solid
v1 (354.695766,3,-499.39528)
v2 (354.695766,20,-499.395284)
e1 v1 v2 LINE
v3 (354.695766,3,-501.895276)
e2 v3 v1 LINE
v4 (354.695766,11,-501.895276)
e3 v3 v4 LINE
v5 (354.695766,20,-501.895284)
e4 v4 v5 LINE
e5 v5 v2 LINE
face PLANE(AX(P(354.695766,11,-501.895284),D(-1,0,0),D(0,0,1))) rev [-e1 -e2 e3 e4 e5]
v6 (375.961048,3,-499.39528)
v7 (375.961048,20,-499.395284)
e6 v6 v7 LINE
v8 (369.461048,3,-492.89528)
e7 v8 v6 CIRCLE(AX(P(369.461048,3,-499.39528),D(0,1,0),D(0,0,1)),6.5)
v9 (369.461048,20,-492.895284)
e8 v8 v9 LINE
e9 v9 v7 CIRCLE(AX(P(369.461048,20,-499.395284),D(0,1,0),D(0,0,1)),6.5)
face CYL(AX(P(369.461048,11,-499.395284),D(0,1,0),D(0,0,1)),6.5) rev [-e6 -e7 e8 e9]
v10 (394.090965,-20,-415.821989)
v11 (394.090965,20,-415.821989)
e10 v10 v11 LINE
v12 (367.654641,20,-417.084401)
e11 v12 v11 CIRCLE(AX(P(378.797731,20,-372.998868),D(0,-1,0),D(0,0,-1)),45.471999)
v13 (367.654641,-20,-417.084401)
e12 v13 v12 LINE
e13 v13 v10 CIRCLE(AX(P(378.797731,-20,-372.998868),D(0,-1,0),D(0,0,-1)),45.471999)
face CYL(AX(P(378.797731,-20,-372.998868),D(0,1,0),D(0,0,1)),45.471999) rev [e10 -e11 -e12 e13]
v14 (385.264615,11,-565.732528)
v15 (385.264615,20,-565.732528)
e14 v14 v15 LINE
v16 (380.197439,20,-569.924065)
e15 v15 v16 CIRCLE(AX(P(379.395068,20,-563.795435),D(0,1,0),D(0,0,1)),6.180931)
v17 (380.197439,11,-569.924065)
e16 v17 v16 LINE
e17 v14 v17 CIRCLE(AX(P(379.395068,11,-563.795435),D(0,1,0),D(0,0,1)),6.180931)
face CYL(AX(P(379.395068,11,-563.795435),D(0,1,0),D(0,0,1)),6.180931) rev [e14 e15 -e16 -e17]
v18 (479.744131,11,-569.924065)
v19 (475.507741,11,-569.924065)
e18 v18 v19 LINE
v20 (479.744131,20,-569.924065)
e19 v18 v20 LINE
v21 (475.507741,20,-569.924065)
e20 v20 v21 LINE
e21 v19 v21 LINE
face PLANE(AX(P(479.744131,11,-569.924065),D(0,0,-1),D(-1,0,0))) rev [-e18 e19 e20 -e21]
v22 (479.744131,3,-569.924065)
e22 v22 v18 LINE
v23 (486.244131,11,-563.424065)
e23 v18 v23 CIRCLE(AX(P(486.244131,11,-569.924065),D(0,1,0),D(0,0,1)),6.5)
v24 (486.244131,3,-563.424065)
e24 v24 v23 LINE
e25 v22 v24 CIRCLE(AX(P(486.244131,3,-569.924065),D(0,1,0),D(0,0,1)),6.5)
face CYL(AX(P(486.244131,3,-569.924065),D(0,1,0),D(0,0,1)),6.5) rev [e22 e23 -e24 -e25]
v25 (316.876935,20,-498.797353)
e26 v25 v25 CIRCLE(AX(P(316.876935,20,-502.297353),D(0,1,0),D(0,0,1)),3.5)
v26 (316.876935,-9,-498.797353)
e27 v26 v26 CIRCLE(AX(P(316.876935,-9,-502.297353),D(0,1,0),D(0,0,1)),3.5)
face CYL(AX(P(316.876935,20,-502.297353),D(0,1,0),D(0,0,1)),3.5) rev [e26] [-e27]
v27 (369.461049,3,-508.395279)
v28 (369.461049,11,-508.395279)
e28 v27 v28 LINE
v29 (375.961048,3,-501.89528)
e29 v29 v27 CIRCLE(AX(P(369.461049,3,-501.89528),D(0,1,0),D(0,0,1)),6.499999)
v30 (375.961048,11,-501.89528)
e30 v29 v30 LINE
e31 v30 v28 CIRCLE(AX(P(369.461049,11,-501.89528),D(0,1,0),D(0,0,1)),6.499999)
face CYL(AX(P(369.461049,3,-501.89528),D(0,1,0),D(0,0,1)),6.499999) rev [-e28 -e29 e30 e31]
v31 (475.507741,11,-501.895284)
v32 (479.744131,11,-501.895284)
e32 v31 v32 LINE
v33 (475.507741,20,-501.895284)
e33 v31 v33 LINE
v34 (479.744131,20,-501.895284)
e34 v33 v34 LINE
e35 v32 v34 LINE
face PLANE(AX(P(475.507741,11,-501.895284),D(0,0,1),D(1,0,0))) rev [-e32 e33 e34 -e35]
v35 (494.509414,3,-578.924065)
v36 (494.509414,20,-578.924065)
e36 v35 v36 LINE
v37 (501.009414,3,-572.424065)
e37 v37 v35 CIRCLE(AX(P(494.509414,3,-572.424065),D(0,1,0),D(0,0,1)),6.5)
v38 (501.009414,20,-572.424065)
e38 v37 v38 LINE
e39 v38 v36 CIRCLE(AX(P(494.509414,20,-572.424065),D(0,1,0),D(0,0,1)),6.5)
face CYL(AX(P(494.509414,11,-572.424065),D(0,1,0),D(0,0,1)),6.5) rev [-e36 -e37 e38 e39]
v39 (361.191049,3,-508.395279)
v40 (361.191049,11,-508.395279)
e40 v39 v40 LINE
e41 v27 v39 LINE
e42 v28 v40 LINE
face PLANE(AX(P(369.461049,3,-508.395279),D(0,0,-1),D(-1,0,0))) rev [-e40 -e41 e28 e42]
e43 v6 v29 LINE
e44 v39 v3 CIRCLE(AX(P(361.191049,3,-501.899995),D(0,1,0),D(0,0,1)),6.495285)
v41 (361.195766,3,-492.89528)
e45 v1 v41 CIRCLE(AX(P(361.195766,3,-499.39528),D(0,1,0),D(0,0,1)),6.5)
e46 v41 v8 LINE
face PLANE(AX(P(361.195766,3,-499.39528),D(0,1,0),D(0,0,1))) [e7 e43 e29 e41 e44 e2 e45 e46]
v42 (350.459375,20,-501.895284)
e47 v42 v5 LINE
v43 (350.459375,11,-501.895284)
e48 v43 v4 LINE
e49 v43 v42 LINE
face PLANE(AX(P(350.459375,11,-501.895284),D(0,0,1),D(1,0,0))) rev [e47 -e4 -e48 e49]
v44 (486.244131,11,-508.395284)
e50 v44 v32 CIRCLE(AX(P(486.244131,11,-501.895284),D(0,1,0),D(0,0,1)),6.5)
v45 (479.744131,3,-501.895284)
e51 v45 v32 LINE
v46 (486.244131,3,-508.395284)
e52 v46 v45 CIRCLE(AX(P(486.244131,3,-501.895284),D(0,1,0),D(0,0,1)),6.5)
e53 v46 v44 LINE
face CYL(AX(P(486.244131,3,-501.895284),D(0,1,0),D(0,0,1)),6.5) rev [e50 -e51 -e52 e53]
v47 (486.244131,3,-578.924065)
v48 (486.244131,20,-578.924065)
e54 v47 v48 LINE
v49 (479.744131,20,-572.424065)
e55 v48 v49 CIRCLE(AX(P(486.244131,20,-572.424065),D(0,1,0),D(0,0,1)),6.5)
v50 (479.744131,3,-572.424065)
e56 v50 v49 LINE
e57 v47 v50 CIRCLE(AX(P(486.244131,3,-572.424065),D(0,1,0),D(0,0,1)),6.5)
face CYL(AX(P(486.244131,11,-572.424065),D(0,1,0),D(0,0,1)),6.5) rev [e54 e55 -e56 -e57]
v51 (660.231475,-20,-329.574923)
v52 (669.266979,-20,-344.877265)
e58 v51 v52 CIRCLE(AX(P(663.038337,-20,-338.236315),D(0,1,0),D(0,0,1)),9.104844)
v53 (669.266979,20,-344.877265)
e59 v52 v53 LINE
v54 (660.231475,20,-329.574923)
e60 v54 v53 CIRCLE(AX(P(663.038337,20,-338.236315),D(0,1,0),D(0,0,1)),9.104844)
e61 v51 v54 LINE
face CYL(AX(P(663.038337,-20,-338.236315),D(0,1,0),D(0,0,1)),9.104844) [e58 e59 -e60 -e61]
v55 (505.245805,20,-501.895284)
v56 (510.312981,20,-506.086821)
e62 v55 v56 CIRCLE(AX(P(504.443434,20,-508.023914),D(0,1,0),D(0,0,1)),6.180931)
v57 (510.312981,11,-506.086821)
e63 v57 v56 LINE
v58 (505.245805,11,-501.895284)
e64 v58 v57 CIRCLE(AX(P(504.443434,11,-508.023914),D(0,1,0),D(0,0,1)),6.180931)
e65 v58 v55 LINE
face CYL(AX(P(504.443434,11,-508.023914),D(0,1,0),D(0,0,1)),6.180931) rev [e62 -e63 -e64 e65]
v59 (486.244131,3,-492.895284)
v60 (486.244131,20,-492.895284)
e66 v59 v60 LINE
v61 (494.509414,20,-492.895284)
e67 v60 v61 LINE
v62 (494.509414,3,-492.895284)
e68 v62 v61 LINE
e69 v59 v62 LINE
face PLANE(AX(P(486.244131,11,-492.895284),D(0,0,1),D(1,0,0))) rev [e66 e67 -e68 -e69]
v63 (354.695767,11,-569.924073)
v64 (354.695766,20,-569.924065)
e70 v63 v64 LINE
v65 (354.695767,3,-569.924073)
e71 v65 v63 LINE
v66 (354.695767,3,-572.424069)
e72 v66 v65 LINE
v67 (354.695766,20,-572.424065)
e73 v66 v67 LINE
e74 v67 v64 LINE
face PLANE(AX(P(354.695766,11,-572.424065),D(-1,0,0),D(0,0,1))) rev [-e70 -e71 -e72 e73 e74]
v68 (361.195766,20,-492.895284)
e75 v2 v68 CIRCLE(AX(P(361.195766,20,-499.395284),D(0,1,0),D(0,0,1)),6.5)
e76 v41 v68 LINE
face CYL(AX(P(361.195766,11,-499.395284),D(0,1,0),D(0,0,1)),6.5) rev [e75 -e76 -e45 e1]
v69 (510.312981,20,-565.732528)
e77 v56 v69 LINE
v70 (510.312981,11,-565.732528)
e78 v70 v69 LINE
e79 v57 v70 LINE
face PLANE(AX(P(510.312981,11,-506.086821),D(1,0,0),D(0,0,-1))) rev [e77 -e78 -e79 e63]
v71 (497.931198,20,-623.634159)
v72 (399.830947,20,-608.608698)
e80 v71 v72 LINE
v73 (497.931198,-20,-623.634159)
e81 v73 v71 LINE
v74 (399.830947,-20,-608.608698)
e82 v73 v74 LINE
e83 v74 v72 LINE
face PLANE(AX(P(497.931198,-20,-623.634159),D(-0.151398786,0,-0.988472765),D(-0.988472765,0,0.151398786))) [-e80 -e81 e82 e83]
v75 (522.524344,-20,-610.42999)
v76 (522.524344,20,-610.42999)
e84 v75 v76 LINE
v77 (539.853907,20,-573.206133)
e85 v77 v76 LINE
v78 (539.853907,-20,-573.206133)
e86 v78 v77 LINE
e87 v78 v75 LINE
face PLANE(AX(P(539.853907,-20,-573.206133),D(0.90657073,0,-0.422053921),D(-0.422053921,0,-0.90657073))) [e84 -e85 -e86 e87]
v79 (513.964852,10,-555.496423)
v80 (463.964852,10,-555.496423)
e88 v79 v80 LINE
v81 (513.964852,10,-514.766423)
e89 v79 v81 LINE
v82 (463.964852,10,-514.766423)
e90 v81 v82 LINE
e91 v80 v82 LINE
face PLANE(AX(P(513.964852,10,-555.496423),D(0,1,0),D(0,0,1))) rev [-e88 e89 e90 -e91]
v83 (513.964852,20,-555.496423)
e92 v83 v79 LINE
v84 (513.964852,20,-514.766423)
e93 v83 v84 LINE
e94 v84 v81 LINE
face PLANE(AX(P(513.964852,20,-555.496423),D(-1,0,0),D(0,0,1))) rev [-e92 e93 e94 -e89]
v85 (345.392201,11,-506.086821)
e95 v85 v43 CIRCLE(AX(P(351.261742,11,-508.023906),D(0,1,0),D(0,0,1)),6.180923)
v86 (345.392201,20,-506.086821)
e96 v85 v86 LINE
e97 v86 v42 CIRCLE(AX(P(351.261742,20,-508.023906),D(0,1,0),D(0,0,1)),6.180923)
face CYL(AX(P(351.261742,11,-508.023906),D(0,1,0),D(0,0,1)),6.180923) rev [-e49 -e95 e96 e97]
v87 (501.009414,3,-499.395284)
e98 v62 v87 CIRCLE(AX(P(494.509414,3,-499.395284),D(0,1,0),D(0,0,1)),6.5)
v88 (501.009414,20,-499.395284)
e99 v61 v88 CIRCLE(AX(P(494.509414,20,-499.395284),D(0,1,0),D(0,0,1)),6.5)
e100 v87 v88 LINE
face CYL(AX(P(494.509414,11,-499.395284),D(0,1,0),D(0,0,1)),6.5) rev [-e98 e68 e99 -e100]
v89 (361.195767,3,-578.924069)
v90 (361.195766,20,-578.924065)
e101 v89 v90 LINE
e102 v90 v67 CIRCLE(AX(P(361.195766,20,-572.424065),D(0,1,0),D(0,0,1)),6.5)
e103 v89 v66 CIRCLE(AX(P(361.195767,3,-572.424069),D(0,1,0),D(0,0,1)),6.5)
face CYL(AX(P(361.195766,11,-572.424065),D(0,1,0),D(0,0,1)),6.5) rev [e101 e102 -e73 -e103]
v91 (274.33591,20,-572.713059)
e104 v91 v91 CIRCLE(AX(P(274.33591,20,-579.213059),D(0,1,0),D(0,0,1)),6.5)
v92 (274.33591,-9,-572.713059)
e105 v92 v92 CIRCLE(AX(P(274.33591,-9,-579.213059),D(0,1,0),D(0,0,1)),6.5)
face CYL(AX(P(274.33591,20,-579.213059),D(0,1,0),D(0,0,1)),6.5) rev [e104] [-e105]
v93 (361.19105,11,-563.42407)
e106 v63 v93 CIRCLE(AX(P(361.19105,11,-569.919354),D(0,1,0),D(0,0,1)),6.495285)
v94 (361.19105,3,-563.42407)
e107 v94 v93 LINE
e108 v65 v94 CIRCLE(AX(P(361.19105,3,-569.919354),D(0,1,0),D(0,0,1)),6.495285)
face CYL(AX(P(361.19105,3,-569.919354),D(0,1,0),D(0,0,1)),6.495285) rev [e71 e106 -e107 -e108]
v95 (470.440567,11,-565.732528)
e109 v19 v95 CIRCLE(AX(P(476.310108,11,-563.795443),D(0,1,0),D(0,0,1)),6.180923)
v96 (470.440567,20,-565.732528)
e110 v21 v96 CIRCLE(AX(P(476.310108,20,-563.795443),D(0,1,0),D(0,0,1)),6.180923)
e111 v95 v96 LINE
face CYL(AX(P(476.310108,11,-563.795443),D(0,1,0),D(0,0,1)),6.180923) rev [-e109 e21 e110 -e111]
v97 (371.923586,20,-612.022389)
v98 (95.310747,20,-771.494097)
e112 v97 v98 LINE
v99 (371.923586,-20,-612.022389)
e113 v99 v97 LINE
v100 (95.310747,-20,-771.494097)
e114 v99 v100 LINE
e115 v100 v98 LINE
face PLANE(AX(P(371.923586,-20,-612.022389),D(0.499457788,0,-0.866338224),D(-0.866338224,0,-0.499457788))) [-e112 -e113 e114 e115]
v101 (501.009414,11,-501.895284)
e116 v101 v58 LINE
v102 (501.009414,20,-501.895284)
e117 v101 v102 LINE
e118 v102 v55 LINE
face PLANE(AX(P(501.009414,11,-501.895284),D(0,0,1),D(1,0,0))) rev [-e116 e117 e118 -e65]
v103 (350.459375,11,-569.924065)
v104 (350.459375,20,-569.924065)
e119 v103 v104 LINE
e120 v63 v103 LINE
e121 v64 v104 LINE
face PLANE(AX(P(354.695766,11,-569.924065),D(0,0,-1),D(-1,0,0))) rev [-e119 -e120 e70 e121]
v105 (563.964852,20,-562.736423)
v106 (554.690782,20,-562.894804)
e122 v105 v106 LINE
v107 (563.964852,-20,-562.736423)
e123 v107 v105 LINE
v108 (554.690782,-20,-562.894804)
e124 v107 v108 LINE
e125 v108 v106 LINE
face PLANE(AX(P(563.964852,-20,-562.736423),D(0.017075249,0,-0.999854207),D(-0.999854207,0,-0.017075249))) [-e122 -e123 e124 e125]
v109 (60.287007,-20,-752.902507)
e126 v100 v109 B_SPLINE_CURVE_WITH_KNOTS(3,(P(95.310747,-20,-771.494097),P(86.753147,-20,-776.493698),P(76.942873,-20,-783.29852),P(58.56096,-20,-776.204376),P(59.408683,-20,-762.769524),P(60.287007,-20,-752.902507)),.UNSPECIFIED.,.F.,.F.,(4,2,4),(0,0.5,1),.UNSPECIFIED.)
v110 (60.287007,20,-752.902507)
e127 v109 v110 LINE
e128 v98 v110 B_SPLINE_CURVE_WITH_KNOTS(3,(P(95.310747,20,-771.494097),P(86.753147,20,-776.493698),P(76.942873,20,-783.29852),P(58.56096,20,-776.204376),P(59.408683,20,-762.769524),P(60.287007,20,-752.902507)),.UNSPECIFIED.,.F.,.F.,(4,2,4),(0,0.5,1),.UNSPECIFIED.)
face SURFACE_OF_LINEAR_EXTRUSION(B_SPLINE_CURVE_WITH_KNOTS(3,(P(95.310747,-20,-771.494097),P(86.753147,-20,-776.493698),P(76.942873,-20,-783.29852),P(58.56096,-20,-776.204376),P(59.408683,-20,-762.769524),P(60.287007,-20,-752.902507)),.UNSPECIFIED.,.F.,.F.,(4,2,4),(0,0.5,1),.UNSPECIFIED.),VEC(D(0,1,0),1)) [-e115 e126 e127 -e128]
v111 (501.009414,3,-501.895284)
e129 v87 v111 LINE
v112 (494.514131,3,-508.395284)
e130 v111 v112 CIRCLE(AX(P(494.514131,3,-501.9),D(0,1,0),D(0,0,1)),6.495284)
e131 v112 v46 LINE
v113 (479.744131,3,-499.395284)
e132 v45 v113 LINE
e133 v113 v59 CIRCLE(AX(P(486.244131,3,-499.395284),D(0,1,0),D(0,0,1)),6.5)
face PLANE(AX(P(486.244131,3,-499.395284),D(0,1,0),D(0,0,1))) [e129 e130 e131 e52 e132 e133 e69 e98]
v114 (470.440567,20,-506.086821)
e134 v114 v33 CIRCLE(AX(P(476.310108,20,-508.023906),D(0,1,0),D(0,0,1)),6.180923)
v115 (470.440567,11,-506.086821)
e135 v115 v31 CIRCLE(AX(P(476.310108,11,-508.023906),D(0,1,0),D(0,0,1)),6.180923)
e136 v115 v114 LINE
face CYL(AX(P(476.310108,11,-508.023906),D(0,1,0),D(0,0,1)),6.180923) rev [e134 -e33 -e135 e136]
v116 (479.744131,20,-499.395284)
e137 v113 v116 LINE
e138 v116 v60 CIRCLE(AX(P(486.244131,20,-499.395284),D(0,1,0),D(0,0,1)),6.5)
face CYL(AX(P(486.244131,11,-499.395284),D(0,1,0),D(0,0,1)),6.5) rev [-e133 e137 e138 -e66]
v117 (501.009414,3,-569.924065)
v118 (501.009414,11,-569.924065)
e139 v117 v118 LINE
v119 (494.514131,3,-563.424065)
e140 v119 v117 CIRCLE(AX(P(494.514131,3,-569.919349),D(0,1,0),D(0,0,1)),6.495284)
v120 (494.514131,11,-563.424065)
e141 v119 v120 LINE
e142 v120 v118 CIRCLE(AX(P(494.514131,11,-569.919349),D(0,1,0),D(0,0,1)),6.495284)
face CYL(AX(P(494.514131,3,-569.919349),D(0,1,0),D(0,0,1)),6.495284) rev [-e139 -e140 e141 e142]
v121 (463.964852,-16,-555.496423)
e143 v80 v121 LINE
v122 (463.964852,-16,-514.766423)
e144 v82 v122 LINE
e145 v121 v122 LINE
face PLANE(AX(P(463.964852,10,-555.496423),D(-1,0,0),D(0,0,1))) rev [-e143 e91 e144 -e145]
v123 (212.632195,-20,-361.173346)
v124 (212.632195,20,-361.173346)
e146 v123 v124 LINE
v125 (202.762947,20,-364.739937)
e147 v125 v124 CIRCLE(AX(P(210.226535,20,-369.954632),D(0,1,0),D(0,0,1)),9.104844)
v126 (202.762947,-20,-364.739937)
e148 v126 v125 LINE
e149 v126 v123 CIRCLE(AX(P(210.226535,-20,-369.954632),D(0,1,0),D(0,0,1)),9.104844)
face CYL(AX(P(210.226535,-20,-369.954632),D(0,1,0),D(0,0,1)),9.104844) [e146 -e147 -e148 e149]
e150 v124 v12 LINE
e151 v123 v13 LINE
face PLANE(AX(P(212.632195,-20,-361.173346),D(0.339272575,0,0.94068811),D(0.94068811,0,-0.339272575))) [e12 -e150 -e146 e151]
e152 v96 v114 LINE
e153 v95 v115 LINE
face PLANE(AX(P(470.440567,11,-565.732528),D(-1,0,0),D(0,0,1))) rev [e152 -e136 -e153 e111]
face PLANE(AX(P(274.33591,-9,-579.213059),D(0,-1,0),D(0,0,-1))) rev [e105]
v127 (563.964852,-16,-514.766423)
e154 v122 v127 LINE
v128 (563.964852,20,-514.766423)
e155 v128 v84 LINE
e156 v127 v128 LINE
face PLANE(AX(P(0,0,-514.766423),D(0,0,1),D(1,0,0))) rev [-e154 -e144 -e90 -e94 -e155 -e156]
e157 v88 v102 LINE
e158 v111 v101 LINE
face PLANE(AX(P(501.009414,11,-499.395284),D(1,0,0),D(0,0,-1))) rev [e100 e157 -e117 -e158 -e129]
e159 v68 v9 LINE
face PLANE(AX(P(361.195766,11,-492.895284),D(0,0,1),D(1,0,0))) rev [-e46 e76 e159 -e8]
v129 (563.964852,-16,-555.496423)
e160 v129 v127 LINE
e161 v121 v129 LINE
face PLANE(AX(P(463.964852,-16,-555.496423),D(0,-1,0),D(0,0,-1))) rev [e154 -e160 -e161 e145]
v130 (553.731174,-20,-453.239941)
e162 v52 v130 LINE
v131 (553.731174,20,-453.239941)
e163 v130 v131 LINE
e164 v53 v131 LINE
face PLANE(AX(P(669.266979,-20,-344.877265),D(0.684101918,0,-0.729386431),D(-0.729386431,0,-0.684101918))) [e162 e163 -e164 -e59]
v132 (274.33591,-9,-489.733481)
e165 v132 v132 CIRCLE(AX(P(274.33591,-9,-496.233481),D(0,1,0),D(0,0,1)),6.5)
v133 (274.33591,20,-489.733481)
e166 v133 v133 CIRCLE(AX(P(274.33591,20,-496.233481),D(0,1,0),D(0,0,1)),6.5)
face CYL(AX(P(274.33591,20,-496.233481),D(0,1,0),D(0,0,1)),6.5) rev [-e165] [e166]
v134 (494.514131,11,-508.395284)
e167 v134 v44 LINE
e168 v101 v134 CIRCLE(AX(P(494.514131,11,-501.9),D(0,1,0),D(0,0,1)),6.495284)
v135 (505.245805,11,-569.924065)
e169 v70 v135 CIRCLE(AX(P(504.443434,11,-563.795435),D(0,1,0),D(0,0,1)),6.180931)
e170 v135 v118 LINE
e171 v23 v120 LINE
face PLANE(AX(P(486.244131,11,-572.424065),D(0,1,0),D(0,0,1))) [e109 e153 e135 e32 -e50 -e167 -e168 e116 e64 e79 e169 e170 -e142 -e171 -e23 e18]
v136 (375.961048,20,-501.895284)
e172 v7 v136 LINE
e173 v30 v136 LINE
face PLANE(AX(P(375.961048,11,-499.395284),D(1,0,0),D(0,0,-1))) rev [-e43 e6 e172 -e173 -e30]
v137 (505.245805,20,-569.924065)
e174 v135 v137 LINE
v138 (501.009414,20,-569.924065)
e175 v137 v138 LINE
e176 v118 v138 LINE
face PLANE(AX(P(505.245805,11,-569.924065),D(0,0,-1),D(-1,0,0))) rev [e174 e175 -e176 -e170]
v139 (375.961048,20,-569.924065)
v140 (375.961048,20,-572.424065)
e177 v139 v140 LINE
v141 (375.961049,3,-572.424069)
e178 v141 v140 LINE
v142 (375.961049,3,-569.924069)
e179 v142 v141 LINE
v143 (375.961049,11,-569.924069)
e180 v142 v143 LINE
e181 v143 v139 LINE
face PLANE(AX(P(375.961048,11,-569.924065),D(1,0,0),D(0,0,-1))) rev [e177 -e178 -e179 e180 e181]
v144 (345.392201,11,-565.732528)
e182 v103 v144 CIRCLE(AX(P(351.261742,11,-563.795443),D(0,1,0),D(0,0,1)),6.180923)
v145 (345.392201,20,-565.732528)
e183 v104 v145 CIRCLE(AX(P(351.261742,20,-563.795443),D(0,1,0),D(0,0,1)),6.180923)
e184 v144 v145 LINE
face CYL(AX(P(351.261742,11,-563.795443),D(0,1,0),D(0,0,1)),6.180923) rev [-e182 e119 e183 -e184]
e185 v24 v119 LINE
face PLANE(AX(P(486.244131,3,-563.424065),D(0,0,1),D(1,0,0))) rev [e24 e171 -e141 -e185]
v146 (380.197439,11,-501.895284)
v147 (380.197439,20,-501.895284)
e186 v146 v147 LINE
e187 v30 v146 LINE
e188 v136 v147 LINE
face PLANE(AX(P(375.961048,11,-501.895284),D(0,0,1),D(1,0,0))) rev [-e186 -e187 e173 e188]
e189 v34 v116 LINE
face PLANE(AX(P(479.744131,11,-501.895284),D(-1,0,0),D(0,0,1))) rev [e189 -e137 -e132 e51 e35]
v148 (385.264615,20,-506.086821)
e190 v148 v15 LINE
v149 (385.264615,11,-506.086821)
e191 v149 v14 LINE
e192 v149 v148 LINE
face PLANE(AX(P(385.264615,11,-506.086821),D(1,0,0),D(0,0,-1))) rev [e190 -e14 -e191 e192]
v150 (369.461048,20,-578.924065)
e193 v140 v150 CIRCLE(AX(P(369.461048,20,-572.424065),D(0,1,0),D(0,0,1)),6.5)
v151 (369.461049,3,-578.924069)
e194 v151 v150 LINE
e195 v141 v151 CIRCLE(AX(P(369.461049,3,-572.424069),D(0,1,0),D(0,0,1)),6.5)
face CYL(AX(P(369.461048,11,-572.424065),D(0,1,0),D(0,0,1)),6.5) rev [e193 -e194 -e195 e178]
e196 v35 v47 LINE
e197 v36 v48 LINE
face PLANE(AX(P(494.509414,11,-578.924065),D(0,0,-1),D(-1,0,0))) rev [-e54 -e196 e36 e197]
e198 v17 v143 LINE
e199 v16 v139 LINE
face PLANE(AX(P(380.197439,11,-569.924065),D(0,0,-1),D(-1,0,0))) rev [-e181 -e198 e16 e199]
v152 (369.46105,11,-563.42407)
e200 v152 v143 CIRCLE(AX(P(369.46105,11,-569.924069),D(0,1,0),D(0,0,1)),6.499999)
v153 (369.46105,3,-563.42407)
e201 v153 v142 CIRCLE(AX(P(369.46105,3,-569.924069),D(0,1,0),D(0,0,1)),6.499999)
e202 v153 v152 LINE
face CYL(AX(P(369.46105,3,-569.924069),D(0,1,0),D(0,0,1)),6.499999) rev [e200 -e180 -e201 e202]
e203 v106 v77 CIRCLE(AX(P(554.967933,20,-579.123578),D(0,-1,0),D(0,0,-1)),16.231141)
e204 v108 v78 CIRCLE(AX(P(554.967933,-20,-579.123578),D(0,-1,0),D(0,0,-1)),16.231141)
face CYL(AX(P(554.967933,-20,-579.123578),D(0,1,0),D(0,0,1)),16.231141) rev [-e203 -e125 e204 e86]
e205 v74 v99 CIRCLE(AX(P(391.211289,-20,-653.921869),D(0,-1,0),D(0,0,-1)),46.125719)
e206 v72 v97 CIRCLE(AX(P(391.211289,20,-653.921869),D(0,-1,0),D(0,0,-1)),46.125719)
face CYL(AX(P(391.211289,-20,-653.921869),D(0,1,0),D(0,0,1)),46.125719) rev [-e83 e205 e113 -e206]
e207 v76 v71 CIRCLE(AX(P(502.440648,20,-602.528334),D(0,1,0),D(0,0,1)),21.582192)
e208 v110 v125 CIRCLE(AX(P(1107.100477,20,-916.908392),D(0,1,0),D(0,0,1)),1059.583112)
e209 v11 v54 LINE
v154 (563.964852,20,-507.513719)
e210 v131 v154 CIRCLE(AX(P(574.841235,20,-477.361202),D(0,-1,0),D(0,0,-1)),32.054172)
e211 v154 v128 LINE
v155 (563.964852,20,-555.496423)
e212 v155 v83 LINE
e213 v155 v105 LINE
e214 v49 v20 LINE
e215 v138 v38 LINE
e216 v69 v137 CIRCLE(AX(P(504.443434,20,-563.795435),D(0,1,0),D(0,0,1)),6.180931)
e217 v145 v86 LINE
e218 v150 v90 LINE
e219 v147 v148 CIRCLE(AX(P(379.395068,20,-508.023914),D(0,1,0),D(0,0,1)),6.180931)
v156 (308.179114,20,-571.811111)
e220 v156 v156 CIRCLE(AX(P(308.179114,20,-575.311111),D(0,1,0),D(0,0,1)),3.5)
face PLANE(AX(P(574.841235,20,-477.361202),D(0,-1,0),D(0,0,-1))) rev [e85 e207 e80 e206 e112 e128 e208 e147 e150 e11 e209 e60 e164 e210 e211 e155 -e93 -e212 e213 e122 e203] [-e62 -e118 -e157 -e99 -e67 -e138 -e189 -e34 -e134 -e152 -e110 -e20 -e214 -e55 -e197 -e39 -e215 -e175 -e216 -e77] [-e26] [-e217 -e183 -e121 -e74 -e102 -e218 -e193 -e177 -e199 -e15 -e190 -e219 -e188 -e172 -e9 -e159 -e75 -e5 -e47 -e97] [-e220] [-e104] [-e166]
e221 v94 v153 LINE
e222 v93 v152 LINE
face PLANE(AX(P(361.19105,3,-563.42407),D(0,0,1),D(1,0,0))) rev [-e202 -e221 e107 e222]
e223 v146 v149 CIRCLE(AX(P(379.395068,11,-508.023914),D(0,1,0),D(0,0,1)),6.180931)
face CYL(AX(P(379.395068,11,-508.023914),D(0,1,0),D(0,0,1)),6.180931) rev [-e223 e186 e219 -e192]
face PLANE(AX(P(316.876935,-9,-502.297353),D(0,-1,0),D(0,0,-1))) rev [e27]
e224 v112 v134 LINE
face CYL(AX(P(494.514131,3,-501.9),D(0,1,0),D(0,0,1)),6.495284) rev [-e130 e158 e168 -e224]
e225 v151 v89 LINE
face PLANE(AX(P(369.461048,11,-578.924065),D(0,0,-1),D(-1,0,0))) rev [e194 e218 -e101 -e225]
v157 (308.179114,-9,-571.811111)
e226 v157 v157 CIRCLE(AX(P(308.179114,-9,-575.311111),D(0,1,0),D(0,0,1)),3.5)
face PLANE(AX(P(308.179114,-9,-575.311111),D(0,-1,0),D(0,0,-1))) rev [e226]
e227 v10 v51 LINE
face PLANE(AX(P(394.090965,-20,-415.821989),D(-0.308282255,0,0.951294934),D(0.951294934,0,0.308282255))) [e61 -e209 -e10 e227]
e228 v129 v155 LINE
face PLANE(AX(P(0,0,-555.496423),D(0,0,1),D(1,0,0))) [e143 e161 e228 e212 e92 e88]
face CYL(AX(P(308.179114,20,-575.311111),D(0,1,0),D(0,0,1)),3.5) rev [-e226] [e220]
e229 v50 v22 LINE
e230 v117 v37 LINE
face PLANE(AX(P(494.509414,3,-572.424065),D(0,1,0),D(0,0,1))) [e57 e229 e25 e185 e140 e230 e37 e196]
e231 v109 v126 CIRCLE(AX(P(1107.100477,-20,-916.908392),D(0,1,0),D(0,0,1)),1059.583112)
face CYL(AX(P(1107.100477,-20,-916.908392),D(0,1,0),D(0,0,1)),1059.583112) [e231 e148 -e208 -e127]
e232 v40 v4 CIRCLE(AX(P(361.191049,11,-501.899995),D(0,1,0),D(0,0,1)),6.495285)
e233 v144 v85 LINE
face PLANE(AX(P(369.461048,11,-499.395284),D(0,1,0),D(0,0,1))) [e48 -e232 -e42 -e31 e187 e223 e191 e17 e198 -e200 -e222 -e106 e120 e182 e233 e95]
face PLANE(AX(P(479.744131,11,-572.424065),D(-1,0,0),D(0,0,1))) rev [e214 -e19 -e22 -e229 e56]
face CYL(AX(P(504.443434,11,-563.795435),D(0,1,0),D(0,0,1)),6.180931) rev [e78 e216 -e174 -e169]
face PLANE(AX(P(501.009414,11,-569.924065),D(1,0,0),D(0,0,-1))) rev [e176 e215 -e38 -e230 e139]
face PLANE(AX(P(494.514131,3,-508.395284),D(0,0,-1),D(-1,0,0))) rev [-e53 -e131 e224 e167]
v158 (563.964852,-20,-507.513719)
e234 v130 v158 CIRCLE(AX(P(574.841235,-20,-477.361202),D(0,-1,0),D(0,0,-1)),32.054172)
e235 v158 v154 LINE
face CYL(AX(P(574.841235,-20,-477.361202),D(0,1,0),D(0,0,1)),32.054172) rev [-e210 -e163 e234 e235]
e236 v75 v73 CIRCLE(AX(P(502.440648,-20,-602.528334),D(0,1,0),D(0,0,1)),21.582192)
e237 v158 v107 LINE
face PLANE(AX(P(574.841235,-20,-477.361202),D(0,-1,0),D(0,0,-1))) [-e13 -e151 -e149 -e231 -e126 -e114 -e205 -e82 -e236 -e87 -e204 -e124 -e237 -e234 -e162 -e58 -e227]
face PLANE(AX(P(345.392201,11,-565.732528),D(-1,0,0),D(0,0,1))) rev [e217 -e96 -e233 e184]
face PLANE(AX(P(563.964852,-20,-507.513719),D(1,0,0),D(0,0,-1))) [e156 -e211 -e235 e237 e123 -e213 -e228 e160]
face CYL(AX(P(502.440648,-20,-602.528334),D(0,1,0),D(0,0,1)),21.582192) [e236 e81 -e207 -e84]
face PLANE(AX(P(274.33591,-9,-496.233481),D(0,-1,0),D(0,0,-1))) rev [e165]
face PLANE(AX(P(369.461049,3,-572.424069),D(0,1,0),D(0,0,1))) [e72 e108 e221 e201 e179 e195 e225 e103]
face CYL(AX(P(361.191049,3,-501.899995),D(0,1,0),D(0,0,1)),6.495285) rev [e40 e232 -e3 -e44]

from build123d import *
from OCP.BRepAlgoAPI import BRepAlgoAPI_Cut
from OCP.TopTools import TopTools_ListOfShape
from build123d.topology import SkipClean

# Parameters (mm, degrees)
BOSS_EXTRUDE1_DEPTH            = 40
CUT_EXTRUDE1_DEPTH             = 9
CUT_EXTRUDE2_DEPTH             = 8
CUT_EXTRUDE3_DEPTH             = 9
CUT_EXTRUDE4_DEPTH             = 8
CUT_EXTRUDE5_DEPTH             = 8
CUT_EXTRUDE6_DEPTH             = 8
CUT_EXTRUDE7_DEPTH             = 40.73
F_7_0_7_DIAMETER_HOLE1_D       = 7
F_7_0_7_DIAMETER_HOLE1_DEPTH   = 29
F_13_0_13_DIAMETER_HOLE1_D     = 13
F_13_0_13_DIAMETER_HOLE1_DEPTH = 29


with BuildPart() as part:
    # Sketch1 → Boss-Extrude1 (new body)
    with BuildSketch(Plane(origin=(0, 20, 0), x_dir=(1, 0, 0), z_dir=(0, 1, 0))):
        with BuildLine():
            Line((563.96485174, 507.513718698), (563.96485174, 562.736423486))
            Line((563.96485174, 562.736423486), (554.690781869, 562.894803628))
            ThreePointArc((554.690781869, 562.894803628), (545.704943994, 565.795150829), (539.853906856, 573.206133263))
            Line((539.853906856, 573.206133263), (522.524343645, 610.429990226))
            ThreePointArc((522.524343645, 610.429990226), (512.649800976, 621.543175495), (497.931198247, 623.634159339))
            Line((497.931198247, 623.634159339), (399.830947056, 608.608698386))
            ThreePointArc((399.830947056, 608.608698386), (385.610832142, 608.137408426), (371.923585817, 612.02238853))
            Line((371.923585817, 612.02238853), (95.310746964, 771.494097008))
            add(Edge.make_bspline(
                [(60.287007155, 752.902507236), (59.408683029, 762.769524202), (58.560960325, 776.204376236), (76.94287295, 783.298520304), (86.753146937, 776.493697586), (95.310746964, 771.494097008)],
                knots=[0, 0, 0, 0, 0.5, 0.5, 1, 1, 1, 1], degree=3))
            ThreePointArc((60.287007155, 752.902507236), (112.407005996, 551.803928099), (202.762947005, 364.739937083))
            ThreePointArc((202.762947005, 364.739937083), (207.132055784, 361.391783138), (212.632195034, 361.173346422))
            Line((212.632195034, 361.173346422), (367.65464082, 417.084401042))
            ThreePointArc((367.65464082, 417.084401042), (380.966681082, 418.419109504), (394.090964942, 415.82198883))
            Line((394.090964942, 415.82198883), (660.231475403, 329.574923038))
            ThreePointArc((660.231475403, 329.574923038), (670.878462163, 333.606992627), (669.266978502, 344.877264703))
            Line((669.266978502, 344.877264703), (553.73117364, 453.239940989))
            ThreePointArc((553.73117364, 453.239940989), (543.342125743, 483.300566911), (563.96485174, 507.513718698))
        make_face()
    extrude(amount=-BOSS_EXTRUDE1_DEPTH)

    # Sketch2 → Cut-Extrude1 (cut)
    with BuildSketch(Plane(origin=(0, 20, 0), x_dir=(-1, 0, 0), z_dir=(0, 1, 0))):
        with BuildLine():
            Line((-375.961047941, -499.395283579), (-375.961047941, -501.895283579))
            Line((-375.961047941, -501.895283579), (-380.19743869, -501.895283579))
            ThreePointArc((-380.19743869, -501.895283579), (-383.334721276, -503.261242071), (-385.264615119, -506.086820662))
            Line((-385.264615119, -506.086820662), (-385.264615119, -565.732528297))
            ThreePointArc((-385.264615119, -565.732528297), (-383.334721277, -568.558106887), (-380.197438694, -569.924065379))
            Line((-380.197438694, -569.924065379), (-375.961047941, -569.924065379))
            Line((-375.961047941, -569.924065379), (-375.961047941, -572.424065379))
            ThreePointArc((-375.961047941, -572.424065379), (-374.057242019, -577.020259457), (-369.461047941, -578.924065379))
            Line((-369.461047941, -578.924065379), (-361.195765613, -578.924065379))
            ThreePointArc((-361.195765613, -578.924065379), (-356.599571535, -577.020259457), (-354.695765613, -572.424065379))
            Line((-354.695765613, -572.424065379), (-354.695765613, -569.924065379))
            Line((-354.695765613, -569.924065379), (-350.459374862, -569.924065379))
            ThreePointArc((-350.459374862, -569.924065379), (-347.322092956, -568.55810734), (-345.3922012, -565.732528296))
            Line((-345.3922012, -565.732528296), (-345.3922012, -506.086820663))
            ThreePointArc((-345.3922012, -506.086820663), (-347.322092957, -503.261241618), (-350.459374866, -501.895283579))
            Line((-350.459374866, -501.895283579), (-354.695765613, -501.895283579))
            Line((-354.695765613, -501.895283579), (-354.695765613, -499.395283579))
            ThreePointArc((-354.695765613, -499.395283579), (-356.599571535, -494.799089501), (-361.195765613, -492.895283579))
            Line((-361.195765613, -492.895283579), (-369.461047941, -492.895283579))
            ThreePointArc((-369.461047941, -492.895283579), (-374.057242019, -494.799089501), (-375.961047941, -499.395283579))
        make_face()
    extrude(amount=-CUT_EXTRUDE1_DEPTH, mode=Mode.SUBTRACT)

    # Sketch3 → Cut-Extrude2 (cut)
    with BuildSketch(Plane(origin=(0, 11, 0), x_dir=(-1, 0, 0), z_dir=(0, 1, 0))):
        with BuildLine():
            Line((-361.195765613, -492.895279984), (-369.461047941, -492.895279984))
            ThreePointArc((-369.461047941, -492.895279984), (-374.057242019, -494.799085907), (-375.961047941, -499.395279985))
            Line((-375.961047941, -499.395279985), (-375.961047941, -501.895279985))
            ThreePointArc((-375.961047941, -501.895279985), (-374.057242221, -506.491473573), (-369.461048632, -508.395279293))
            Line((-369.461048632, -508.395279293), (-361.19104863, -508.395279293))
            ThreePointArc((-361.19104863, -508.395279293), (-356.596520928, -506.491186012), (-354.695765613, -501.895276389))
            Line((-354.695765613, -501.895276389), (-354.695765613, -499.395279984))
            ThreePointArc((-354.695765613, -499.395279984), (-356.599571535, -494.799085907), (-361.195765613, -492.895279984))
        make_face()
    extrude(amount=-CUT_EXTRUDE2_DEPTH, mode=Mode.SUBTRACT)

    # Sketch4 → Cut-Extrude3 (cut)
    with BuildSketch(Plane(origin=(0, 20, 0), x_dir=(-1, 0, 0), z_dir=(0, 1, 0))):
        with BuildLine():
            Line((-479.744131485, -572.424065379), (-479.744131485, -569.924065379))
            Line((-479.744131485, -569.924065379), (-475.507740734, -569.924065379))
            ThreePointArc((-475.507740734, -569.924065379), (-472.370458828, -568.55810734), (-470.440567072, -565.732528296))
            Line((-470.440567072, -565.732528296), (-470.440567072, -506.086820663))
            ThreePointArc((-470.440567072, -506.086820663), (-472.370458829, -503.261241618), (-475.507740738, -501.895283579))
            Line((-475.507740738, -501.895283579), (-479.744131485, -501.895283579))
            Line((-479.744131485, -501.895283579), (-479.744131485, -499.395283579))
            ThreePointArc((-479.744131485, -499.395283579), (-481.647937407, -494.799089501), (-486.244131485, -492.895283579))
            Line((-486.244131485, -492.895283579), (-494.509413812, -492.895283579))
            ThreePointArc((-494.509413812, -492.895283579), (-499.10560789, -494.799089501), (-501.009413812, -499.395283579))
            Line((-501.009413812, -499.395283579), (-501.009413812, -501.895283579))
            Line((-501.009413812, -501.895283579), (-505.245804562, -501.895283579))
            ThreePointArc((-505.245804562, -501.895283579), (-508.383087148, -503.261242071), (-510.312980991, -506.086820662))
            Line((-510.312980991, -506.086820662), (-510.312980991, -565.732528297))
            ThreePointArc((-510.312980991, -565.732528297), (-508.383087149, -568.558106887), (-505.245804566, -569.924065379))
            Line((-505.245804566, -569.924065379), (-501.009413812, -569.924065379))
            Line((-501.009413812, -569.924065379), (-501.009413812, -572.424065379))
            ThreePointArc((-501.009413812, -572.424065379), (-499.10560789, -577.020259457), (-494.509413812, -578.924065379))
            Line((-494.509413812, -578.924065379), (-486.244131485, -578.924065379))
            ThreePointArc((-486.244131485, -578.924065379), (-481.647937407, -577.020259457), (-479.744131485, -572.424065379))
        make_face()
    extrude(amount=-CUT_EXTRUDE3_DEPTH, mode=Mode.SUBTRACT)

    # Sketch5 → Cut-Extrude4 (cut)
    with BuildSketch(Plane(origin=(0, 11, 0), x_dir=(-1, 0, 0), z_dir=(0, 1, 0))):
        with BuildLine():
            Line((-486.244131485, -492.895283579), (-494.509413812, -492.895283579))
            ThreePointArc((-494.509413812, -492.895283579), (-499.10560789, -494.799089501), (-501.009413812, -499.395283579))
            Line((-501.009413812, -499.395283579), (-501.009413812, -501.895283579))
            ThreePointArc((-501.009413812, -501.895283579), (-499.108657916, -506.491191283), (-494.514131485, -508.395283579))
            Line((-494.514131485, -508.395283579), (-486.244131485, -508.395283579))
            ThreePointArc((-486.244131485, -508.395283579), (-481.647937407, -506.491477657), (-479.744131485, -501.895283579))
            Line((-479.744131485, -501.895283579), (-479.744131485, -499.395283579))
            ThreePointArc((-479.744131485, -499.395283579), (-481.647937407, -494.799089501), (-486.244131485, -492.895283579))
        make_face()
    extrude(amount=-CUT_EXTRUDE4_DEPTH, mode=Mode.SUBTRACT)


with BuildPart() as cut_extrude5_tool:
    # Sketch6 → Cut-Extrude5 (new body)
    with BuildSketch(Plane(origin=(0, 11, 0), x_dir=(-1, 0, 0), z_dir=(0, 1, 0))):
        with BuildLine():
            Line((-369.461049324, -578.924068974), (-361.195766995, -578.924068974))
            ThreePointArc((-361.195766995, -578.924068974), (-356.599572918, -577.020263051), (-354.695766995, -572.424068974))
            Line((-354.695766995, -572.424068974), (-354.695766995, -569.924072568))
            ThreePointArc((-354.695766995, -569.924072568), (-356.59652231, -565.328162946), (-361.191050012, -563.424069665))
            Line((-361.191050012, -563.424069665), (-369.461050015, -563.424069665))
            ThreePointArc((-369.461050015, -563.424069665), (-374.057243604, -565.327875385), (-375.961049323, -569.924068973))
            Line((-375.961049323, -569.924068973), (-375.961049323, -572.424068974))
            ThreePointArc((-375.961049323, -572.424068974), (-374.057243401, -577.020263051), (-369.461049324, -578.924068974))
        make_face()
    extrude(amount=-CUT_EXTRUDE5_DEPTH)


with BuildPart() as part_1:
    add(part.part)

    # Cut-Extrude5: cut by cut_extrude5_tool, with a tolerance
    cut_extrude5_stock = TopTools_ListOfShape()
    cut_extrude5_stock.Append(part_1.part.wrapped)
    cut_extrude5_tools = TopTools_ListOfShape()
    cut_extrude5_tools.Append(cut_extrude5_tool.part.wrapped)
    cut_extrude5_cut = BRepAlgoAPI_Cut()
    cut_extrude5_cut.SetArguments(cut_extrude5_stock)
    cut_extrude5_cut.SetTools(cut_extrude5_tools)
    cut_extrude5_cut.SetFuzzyValue(0.00001)
    cut_extrude5_cut.Build()
    add(Compound.cast(cut_extrude5_cut.Shape()).solids(), mode=Mode.REPLACE)

    # Sketch7 → Cut-Extrude6 (cut)
    with SkipClean():  # the faces are left unmerged after this step: merging them gives an invalid solid
        with BuildSketch(Plane(origin=(0, 11, 0), x_dir=(-1, 0, 0), z_dir=(0, 1, 0))):
            with BuildLine():
                Line((-494.509413812, -578.924065379), (-486.244131485, -578.924065379))
                ThreePointArc((-486.244131485, -578.924065379), (-481.647937407, -577.020259457), (-479.744131485, -572.424065379))
                Line((-479.744131485, -572.424065379), (-479.744131485, -569.924065379))
                ThreePointArc((-479.744131485, -569.924065379), (-481.647937407, -565.327871301), (-486.244131485, -563.424065379))
                Line((-486.244131485, -563.424065379), (-494.514131485, -563.424065379))
                ThreePointArc((-494.514131485, -563.424065379), (-499.108657916, -565.328157675), (-501.009413812, -569.924065379))
                Line((-501.009413812, -569.924065379), (-501.009413812, -572.424065379))
                ThreePointArc((-501.009413812, -572.424065379), (-499.10560789, -577.020259457), (-494.509413812, -578.924065379))
            make_face()
        extrude(amount=-CUT_EXTRUDE6_DEPTH, mode=Mode.SUBTRACT)

    # Sketch8 → Cut-Extrude7 (cut)
    with SkipClean():  # the faces are left unmerged after this step: merging them gives an invalid solid
        with BuildSketch(Plane.XY.offset(-514.76642324)):
            Polygon((463.964851744, -16), (563.964851744, -16), (563.964851744, 20), (513.964851744, 20), (513.964851744, 10), (463.964851744, 10), align=None)
        extrude(amount=-CUT_EXTRUDE7_DEPTH, mode=Mode.SUBTRACT)

    # Ø7.0 (7) Diameter Hole1
    with Locations(Plane(origin=(0, 20, 0), x_dir=(1, 0, 0), z_dir=(0, 1, 0))):
        with Locations((308.179113698, 575.311111117), (316.876935056, 502.297353485)):
            Hole(F_7_0_7_DIAMETER_HOLE1_D / 2, depth=F_7_0_7_DIAMETER_HOLE1_DEPTH)

    # Ø13.0 (13) Diameter Hole1
    with Locations(Plane(origin=(0, 20, 0), x_dir=(1, 0, 0), z_dir=(0, 1, 0))):
        with Locations((274.335910331, 496.233480955), (274.335910331, 579.213058938)):
            Hole(F_13_0_13_DIAMETER_HOLE1_D / 2, depth=F_13_0_13_DIAMETER_HOLE1_DEPTH)


solid = part_1.part
